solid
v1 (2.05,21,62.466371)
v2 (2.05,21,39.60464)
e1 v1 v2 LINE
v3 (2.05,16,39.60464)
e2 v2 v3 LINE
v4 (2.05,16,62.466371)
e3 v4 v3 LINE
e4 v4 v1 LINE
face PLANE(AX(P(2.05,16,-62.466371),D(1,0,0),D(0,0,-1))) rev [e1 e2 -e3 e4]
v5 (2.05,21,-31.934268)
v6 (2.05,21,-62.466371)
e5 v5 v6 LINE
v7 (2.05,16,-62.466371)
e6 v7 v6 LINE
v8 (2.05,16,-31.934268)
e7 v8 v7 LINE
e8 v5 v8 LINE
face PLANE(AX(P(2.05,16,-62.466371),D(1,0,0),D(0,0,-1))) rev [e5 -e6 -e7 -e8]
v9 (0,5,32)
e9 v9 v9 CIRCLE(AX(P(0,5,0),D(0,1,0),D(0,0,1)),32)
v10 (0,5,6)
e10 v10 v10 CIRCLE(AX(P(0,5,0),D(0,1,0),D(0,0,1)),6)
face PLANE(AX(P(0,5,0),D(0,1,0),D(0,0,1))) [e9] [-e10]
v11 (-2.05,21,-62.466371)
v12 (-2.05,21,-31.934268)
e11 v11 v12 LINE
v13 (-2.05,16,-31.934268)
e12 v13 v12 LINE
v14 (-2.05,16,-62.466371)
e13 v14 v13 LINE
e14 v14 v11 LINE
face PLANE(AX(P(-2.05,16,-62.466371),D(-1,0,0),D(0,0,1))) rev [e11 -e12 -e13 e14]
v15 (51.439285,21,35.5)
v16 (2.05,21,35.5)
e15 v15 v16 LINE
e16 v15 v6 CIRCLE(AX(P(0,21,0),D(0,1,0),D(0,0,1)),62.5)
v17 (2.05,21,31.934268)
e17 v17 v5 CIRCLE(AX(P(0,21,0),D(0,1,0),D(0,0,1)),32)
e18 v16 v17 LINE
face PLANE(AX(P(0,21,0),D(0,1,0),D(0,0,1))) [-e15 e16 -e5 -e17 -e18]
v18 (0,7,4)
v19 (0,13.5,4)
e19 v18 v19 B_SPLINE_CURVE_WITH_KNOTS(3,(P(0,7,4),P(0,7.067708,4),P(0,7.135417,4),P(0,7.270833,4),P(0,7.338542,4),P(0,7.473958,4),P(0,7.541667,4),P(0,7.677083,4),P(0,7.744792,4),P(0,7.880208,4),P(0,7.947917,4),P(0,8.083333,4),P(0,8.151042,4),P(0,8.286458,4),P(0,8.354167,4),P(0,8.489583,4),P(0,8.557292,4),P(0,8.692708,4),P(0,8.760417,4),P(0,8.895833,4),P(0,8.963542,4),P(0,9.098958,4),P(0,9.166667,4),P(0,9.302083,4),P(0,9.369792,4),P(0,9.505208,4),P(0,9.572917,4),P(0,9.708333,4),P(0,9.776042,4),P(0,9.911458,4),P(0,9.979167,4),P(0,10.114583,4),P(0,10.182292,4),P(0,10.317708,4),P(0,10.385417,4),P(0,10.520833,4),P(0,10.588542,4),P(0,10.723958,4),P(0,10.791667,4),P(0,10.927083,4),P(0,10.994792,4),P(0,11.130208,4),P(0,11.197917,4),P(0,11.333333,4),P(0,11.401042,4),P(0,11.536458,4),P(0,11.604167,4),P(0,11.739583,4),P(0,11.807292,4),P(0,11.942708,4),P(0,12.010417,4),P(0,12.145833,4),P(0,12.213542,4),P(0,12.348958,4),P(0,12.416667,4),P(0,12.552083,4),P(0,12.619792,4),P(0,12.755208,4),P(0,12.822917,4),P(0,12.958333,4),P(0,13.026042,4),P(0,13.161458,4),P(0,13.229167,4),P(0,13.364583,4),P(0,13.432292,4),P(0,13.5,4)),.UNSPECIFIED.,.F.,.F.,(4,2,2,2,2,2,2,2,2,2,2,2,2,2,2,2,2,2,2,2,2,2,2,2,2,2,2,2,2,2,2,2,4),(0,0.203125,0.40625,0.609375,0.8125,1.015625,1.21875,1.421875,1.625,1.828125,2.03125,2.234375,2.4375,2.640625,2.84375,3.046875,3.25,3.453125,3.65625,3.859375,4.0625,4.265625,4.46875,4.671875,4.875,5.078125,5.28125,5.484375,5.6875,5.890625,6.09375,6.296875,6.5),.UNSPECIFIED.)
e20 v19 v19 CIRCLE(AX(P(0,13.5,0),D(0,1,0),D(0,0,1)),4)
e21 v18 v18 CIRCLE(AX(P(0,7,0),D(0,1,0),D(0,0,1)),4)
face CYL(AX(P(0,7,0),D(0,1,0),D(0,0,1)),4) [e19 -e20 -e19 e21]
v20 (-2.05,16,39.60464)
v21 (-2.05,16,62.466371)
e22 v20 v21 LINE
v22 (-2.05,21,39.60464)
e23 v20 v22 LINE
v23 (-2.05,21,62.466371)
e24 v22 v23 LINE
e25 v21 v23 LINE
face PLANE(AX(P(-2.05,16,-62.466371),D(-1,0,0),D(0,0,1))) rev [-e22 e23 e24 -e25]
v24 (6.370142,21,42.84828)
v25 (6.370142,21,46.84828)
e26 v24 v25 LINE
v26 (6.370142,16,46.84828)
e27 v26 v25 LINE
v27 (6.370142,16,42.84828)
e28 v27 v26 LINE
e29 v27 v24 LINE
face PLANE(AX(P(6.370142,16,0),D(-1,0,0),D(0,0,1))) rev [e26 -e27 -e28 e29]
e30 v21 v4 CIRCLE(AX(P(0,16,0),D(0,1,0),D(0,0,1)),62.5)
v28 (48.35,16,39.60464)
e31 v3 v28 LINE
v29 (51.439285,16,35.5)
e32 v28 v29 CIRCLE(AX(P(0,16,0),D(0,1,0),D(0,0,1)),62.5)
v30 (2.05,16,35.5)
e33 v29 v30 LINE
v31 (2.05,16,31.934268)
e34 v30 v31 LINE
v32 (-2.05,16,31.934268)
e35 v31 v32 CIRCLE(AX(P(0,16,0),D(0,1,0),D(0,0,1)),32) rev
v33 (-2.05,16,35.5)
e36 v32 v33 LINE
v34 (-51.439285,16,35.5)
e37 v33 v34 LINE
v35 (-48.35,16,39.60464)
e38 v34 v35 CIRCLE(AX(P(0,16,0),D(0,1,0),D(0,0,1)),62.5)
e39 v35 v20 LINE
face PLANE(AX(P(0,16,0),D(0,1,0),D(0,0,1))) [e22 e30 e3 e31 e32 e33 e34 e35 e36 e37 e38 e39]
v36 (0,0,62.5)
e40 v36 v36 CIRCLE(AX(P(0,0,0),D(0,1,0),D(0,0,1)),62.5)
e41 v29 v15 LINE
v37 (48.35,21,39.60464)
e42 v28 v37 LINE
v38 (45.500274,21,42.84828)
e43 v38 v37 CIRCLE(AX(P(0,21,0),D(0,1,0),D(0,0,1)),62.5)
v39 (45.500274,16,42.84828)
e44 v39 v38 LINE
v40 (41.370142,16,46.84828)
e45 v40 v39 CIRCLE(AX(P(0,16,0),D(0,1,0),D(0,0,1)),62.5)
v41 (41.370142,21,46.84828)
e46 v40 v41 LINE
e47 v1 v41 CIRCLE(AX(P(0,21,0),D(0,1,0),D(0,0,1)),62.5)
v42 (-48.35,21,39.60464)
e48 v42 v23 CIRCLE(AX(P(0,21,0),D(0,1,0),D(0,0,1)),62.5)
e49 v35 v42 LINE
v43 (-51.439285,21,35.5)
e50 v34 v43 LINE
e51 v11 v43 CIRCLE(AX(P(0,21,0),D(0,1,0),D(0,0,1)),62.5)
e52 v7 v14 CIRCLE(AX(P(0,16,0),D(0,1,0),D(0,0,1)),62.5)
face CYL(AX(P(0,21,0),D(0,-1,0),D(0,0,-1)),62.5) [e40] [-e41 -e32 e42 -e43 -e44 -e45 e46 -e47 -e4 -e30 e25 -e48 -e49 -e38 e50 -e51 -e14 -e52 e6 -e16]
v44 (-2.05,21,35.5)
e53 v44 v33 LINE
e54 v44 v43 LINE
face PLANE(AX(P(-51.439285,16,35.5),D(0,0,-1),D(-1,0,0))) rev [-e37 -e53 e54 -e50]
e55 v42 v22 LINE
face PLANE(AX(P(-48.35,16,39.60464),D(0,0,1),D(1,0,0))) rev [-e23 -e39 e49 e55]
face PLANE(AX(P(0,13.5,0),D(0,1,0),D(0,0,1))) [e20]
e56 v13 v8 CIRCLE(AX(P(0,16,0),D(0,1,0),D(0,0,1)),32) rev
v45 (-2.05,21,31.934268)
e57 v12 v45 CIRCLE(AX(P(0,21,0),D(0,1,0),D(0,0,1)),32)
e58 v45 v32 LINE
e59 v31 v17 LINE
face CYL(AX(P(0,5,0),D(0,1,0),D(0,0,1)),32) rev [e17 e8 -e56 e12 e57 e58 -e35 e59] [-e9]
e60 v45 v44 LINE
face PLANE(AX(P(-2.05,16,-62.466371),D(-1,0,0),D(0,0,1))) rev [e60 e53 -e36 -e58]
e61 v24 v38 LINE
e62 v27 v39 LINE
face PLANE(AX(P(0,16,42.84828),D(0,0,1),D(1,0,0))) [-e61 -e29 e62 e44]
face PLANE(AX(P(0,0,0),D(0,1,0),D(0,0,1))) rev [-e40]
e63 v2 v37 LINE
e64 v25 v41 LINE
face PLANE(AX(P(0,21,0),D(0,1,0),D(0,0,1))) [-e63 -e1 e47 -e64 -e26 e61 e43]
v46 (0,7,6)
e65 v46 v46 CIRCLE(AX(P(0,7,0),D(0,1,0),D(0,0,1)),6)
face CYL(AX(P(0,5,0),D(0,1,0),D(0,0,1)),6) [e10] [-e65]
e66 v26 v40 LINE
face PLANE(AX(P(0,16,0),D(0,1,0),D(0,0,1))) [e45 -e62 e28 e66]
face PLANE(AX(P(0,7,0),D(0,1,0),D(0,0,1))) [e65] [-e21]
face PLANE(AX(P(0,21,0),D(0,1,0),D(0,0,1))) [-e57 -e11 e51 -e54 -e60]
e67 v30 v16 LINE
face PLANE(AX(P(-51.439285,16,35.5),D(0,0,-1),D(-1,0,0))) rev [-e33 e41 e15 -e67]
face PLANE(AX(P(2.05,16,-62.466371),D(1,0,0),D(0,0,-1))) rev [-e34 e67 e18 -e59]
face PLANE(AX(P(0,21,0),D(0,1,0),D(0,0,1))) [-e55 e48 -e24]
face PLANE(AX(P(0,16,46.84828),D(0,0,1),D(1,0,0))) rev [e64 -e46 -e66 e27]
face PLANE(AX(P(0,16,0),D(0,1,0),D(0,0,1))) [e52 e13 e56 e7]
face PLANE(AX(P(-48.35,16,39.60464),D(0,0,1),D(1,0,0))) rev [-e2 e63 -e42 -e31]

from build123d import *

# Parameters (mm, degrees)
SKETCH1_R           = 62.5
BOSS_EXTRUDE1_DEPTH = 21
SKETCH2_R           = 32
SKETCH2_R_2         = 6
CUT_EXTRUDE1_DEPTH  = 16
SKETCH3_R           = 6
SKETCH3_R_2         = 4
CUT_EXTRUDE2_DEPTH  = 14
SKETCH4_R           = 4
CUT_EXTRUDE3_DEPTH  = 7.5
CUT_EXTRUDE4_START  = -5
CUT_EXTRUDE4_DEPTH  = 5
CUT_EXTRUDE5_START  = -5
CUT_EXTRUDE5_DEPTH  = 5
CUT_EXTRUDE6_START  = -5
CUT_EXTRUDE6_DEPTH  = 5


with BuildPart() as part:
    # Sketch1 → Boss-Extrude1 (new body)
    with BuildSketch(Plane(origin=(0, 0, 0), x_dir=(1, 0, 0), z_dir=(0, 1, 0))):
        Circle(SKETCH1_R)
    extrude(amount=BOSS_EXTRUDE1_DEPTH)

    # Sketch2 → Cut-Extrude1 (cut)
    with BuildSketch(Plane(origin=(0, 21, 0), x_dir=(1, 0, 0), z_dir=(0, 1, 0))):
        Circle(SKETCH2_R)
        Circle(SKETCH2_R_2, mode=Mode.SUBTRACT)
    extrude(amount=-CUT_EXTRUDE1_DEPTH, mode=Mode.SUBTRACT)

    # Sketch3 → Cut-Extrude2 (cut)
    with BuildSketch(Plane(origin=(0, 21, 0), x_dir=(1, 0, 0), z_dir=(0, 1, 0))):
        Circle(SKETCH3_R)
        Circle(SKETCH3_R_2, mode=Mode.SUBTRACT)
    extrude(amount=-CUT_EXTRUDE2_DEPTH, mode=Mode.SUBTRACT)

    # Sketch4 → Cut-Extrude3 (cut)
    with BuildSketch(Plane(origin=(0, 21, 0), x_dir=(1, 0, 0), z_dir=(0, 1, 0))):
        Circle(SKETCH4_R)
    extrude(amount=-CUT_EXTRUDE3_DEPTH, mode=Mode.SUBTRACT)

    # Sketch5 → Cut-Extrude4 (cut)
    with BuildSketch(Plane(origin=(0, 21, 0), x_dir=(1, 0, 0), z_dir=(0, 1, 0)).offset(CUT_EXTRUDE4_START)):
        with BuildLine():
            Line((2.05, 62.466370953), (2.05, -62.466370953))
            ThreePointArc((2.05, -62.466370953), (0, -62.5), (-2.05, -62.466370953))
            Line((-2.05, -62.466370953), (-2.05, 62.466370953))
            ThreePointArc((-2.05, 62.466370953), (0, 62.5), (2.05, 62.466370953))
        make_face()
    extrude(amount=CUT_EXTRUDE4_DEPTH, mode=Mode.SUBTRACT)

    # Sketch6 → Cut-Extrude5 (cut)
    with BuildSketch(Plane(origin=(0, 21, 0), x_dir=(1, 0, 0), z_dir=(0, 1, 0)).offset(CUT_EXTRUDE5_START)):
        with BuildLine():
            Line((-48.35, -39.60463988), (48.35, -39.60463988))
            ThreePointArc((48.35, -39.60463988), (49.936833573, -37.584074456), (51.439284598, -35.5))
            Line((51.439284598, -35.5), (-51.439284598, -35.5))
            ThreePointArc((-51.439284598, -35.5), (-49.936833573, -37.584074456), (-48.35, -39.60463988))
        make_face()
    extrude(amount=CUT_EXTRUDE5_DEPTH, mode=Mode.SUBTRACT)

    # Sketch9 → Cut-Extrude6 (cut)
    with BuildSketch(Plane(origin=(0, 21, 0), x_dir=(1, 0, 0), z_dir=(0, 1, 0)).offset(CUT_EXTRUDE6_START)):
        with BuildLine():
            Line((45.500273824, -42.848279801), (6.37014237, -42.848279801))
            Line((6.37014237, -42.848279801), (6.37014237, -46.848279801))
            Line((6.37014237, -46.848279801), (41.37014237, -46.848279801))
            ThreePointArc((41.37014237, -46.848279801), (43.481229311, -44.895798217), (45.500273824, -42.848279801))
        make_face()
    extrude(amount=CUT_EXTRUDE6_DEPTH, mode=Mode.SUBTRACT)


solid = part.part
